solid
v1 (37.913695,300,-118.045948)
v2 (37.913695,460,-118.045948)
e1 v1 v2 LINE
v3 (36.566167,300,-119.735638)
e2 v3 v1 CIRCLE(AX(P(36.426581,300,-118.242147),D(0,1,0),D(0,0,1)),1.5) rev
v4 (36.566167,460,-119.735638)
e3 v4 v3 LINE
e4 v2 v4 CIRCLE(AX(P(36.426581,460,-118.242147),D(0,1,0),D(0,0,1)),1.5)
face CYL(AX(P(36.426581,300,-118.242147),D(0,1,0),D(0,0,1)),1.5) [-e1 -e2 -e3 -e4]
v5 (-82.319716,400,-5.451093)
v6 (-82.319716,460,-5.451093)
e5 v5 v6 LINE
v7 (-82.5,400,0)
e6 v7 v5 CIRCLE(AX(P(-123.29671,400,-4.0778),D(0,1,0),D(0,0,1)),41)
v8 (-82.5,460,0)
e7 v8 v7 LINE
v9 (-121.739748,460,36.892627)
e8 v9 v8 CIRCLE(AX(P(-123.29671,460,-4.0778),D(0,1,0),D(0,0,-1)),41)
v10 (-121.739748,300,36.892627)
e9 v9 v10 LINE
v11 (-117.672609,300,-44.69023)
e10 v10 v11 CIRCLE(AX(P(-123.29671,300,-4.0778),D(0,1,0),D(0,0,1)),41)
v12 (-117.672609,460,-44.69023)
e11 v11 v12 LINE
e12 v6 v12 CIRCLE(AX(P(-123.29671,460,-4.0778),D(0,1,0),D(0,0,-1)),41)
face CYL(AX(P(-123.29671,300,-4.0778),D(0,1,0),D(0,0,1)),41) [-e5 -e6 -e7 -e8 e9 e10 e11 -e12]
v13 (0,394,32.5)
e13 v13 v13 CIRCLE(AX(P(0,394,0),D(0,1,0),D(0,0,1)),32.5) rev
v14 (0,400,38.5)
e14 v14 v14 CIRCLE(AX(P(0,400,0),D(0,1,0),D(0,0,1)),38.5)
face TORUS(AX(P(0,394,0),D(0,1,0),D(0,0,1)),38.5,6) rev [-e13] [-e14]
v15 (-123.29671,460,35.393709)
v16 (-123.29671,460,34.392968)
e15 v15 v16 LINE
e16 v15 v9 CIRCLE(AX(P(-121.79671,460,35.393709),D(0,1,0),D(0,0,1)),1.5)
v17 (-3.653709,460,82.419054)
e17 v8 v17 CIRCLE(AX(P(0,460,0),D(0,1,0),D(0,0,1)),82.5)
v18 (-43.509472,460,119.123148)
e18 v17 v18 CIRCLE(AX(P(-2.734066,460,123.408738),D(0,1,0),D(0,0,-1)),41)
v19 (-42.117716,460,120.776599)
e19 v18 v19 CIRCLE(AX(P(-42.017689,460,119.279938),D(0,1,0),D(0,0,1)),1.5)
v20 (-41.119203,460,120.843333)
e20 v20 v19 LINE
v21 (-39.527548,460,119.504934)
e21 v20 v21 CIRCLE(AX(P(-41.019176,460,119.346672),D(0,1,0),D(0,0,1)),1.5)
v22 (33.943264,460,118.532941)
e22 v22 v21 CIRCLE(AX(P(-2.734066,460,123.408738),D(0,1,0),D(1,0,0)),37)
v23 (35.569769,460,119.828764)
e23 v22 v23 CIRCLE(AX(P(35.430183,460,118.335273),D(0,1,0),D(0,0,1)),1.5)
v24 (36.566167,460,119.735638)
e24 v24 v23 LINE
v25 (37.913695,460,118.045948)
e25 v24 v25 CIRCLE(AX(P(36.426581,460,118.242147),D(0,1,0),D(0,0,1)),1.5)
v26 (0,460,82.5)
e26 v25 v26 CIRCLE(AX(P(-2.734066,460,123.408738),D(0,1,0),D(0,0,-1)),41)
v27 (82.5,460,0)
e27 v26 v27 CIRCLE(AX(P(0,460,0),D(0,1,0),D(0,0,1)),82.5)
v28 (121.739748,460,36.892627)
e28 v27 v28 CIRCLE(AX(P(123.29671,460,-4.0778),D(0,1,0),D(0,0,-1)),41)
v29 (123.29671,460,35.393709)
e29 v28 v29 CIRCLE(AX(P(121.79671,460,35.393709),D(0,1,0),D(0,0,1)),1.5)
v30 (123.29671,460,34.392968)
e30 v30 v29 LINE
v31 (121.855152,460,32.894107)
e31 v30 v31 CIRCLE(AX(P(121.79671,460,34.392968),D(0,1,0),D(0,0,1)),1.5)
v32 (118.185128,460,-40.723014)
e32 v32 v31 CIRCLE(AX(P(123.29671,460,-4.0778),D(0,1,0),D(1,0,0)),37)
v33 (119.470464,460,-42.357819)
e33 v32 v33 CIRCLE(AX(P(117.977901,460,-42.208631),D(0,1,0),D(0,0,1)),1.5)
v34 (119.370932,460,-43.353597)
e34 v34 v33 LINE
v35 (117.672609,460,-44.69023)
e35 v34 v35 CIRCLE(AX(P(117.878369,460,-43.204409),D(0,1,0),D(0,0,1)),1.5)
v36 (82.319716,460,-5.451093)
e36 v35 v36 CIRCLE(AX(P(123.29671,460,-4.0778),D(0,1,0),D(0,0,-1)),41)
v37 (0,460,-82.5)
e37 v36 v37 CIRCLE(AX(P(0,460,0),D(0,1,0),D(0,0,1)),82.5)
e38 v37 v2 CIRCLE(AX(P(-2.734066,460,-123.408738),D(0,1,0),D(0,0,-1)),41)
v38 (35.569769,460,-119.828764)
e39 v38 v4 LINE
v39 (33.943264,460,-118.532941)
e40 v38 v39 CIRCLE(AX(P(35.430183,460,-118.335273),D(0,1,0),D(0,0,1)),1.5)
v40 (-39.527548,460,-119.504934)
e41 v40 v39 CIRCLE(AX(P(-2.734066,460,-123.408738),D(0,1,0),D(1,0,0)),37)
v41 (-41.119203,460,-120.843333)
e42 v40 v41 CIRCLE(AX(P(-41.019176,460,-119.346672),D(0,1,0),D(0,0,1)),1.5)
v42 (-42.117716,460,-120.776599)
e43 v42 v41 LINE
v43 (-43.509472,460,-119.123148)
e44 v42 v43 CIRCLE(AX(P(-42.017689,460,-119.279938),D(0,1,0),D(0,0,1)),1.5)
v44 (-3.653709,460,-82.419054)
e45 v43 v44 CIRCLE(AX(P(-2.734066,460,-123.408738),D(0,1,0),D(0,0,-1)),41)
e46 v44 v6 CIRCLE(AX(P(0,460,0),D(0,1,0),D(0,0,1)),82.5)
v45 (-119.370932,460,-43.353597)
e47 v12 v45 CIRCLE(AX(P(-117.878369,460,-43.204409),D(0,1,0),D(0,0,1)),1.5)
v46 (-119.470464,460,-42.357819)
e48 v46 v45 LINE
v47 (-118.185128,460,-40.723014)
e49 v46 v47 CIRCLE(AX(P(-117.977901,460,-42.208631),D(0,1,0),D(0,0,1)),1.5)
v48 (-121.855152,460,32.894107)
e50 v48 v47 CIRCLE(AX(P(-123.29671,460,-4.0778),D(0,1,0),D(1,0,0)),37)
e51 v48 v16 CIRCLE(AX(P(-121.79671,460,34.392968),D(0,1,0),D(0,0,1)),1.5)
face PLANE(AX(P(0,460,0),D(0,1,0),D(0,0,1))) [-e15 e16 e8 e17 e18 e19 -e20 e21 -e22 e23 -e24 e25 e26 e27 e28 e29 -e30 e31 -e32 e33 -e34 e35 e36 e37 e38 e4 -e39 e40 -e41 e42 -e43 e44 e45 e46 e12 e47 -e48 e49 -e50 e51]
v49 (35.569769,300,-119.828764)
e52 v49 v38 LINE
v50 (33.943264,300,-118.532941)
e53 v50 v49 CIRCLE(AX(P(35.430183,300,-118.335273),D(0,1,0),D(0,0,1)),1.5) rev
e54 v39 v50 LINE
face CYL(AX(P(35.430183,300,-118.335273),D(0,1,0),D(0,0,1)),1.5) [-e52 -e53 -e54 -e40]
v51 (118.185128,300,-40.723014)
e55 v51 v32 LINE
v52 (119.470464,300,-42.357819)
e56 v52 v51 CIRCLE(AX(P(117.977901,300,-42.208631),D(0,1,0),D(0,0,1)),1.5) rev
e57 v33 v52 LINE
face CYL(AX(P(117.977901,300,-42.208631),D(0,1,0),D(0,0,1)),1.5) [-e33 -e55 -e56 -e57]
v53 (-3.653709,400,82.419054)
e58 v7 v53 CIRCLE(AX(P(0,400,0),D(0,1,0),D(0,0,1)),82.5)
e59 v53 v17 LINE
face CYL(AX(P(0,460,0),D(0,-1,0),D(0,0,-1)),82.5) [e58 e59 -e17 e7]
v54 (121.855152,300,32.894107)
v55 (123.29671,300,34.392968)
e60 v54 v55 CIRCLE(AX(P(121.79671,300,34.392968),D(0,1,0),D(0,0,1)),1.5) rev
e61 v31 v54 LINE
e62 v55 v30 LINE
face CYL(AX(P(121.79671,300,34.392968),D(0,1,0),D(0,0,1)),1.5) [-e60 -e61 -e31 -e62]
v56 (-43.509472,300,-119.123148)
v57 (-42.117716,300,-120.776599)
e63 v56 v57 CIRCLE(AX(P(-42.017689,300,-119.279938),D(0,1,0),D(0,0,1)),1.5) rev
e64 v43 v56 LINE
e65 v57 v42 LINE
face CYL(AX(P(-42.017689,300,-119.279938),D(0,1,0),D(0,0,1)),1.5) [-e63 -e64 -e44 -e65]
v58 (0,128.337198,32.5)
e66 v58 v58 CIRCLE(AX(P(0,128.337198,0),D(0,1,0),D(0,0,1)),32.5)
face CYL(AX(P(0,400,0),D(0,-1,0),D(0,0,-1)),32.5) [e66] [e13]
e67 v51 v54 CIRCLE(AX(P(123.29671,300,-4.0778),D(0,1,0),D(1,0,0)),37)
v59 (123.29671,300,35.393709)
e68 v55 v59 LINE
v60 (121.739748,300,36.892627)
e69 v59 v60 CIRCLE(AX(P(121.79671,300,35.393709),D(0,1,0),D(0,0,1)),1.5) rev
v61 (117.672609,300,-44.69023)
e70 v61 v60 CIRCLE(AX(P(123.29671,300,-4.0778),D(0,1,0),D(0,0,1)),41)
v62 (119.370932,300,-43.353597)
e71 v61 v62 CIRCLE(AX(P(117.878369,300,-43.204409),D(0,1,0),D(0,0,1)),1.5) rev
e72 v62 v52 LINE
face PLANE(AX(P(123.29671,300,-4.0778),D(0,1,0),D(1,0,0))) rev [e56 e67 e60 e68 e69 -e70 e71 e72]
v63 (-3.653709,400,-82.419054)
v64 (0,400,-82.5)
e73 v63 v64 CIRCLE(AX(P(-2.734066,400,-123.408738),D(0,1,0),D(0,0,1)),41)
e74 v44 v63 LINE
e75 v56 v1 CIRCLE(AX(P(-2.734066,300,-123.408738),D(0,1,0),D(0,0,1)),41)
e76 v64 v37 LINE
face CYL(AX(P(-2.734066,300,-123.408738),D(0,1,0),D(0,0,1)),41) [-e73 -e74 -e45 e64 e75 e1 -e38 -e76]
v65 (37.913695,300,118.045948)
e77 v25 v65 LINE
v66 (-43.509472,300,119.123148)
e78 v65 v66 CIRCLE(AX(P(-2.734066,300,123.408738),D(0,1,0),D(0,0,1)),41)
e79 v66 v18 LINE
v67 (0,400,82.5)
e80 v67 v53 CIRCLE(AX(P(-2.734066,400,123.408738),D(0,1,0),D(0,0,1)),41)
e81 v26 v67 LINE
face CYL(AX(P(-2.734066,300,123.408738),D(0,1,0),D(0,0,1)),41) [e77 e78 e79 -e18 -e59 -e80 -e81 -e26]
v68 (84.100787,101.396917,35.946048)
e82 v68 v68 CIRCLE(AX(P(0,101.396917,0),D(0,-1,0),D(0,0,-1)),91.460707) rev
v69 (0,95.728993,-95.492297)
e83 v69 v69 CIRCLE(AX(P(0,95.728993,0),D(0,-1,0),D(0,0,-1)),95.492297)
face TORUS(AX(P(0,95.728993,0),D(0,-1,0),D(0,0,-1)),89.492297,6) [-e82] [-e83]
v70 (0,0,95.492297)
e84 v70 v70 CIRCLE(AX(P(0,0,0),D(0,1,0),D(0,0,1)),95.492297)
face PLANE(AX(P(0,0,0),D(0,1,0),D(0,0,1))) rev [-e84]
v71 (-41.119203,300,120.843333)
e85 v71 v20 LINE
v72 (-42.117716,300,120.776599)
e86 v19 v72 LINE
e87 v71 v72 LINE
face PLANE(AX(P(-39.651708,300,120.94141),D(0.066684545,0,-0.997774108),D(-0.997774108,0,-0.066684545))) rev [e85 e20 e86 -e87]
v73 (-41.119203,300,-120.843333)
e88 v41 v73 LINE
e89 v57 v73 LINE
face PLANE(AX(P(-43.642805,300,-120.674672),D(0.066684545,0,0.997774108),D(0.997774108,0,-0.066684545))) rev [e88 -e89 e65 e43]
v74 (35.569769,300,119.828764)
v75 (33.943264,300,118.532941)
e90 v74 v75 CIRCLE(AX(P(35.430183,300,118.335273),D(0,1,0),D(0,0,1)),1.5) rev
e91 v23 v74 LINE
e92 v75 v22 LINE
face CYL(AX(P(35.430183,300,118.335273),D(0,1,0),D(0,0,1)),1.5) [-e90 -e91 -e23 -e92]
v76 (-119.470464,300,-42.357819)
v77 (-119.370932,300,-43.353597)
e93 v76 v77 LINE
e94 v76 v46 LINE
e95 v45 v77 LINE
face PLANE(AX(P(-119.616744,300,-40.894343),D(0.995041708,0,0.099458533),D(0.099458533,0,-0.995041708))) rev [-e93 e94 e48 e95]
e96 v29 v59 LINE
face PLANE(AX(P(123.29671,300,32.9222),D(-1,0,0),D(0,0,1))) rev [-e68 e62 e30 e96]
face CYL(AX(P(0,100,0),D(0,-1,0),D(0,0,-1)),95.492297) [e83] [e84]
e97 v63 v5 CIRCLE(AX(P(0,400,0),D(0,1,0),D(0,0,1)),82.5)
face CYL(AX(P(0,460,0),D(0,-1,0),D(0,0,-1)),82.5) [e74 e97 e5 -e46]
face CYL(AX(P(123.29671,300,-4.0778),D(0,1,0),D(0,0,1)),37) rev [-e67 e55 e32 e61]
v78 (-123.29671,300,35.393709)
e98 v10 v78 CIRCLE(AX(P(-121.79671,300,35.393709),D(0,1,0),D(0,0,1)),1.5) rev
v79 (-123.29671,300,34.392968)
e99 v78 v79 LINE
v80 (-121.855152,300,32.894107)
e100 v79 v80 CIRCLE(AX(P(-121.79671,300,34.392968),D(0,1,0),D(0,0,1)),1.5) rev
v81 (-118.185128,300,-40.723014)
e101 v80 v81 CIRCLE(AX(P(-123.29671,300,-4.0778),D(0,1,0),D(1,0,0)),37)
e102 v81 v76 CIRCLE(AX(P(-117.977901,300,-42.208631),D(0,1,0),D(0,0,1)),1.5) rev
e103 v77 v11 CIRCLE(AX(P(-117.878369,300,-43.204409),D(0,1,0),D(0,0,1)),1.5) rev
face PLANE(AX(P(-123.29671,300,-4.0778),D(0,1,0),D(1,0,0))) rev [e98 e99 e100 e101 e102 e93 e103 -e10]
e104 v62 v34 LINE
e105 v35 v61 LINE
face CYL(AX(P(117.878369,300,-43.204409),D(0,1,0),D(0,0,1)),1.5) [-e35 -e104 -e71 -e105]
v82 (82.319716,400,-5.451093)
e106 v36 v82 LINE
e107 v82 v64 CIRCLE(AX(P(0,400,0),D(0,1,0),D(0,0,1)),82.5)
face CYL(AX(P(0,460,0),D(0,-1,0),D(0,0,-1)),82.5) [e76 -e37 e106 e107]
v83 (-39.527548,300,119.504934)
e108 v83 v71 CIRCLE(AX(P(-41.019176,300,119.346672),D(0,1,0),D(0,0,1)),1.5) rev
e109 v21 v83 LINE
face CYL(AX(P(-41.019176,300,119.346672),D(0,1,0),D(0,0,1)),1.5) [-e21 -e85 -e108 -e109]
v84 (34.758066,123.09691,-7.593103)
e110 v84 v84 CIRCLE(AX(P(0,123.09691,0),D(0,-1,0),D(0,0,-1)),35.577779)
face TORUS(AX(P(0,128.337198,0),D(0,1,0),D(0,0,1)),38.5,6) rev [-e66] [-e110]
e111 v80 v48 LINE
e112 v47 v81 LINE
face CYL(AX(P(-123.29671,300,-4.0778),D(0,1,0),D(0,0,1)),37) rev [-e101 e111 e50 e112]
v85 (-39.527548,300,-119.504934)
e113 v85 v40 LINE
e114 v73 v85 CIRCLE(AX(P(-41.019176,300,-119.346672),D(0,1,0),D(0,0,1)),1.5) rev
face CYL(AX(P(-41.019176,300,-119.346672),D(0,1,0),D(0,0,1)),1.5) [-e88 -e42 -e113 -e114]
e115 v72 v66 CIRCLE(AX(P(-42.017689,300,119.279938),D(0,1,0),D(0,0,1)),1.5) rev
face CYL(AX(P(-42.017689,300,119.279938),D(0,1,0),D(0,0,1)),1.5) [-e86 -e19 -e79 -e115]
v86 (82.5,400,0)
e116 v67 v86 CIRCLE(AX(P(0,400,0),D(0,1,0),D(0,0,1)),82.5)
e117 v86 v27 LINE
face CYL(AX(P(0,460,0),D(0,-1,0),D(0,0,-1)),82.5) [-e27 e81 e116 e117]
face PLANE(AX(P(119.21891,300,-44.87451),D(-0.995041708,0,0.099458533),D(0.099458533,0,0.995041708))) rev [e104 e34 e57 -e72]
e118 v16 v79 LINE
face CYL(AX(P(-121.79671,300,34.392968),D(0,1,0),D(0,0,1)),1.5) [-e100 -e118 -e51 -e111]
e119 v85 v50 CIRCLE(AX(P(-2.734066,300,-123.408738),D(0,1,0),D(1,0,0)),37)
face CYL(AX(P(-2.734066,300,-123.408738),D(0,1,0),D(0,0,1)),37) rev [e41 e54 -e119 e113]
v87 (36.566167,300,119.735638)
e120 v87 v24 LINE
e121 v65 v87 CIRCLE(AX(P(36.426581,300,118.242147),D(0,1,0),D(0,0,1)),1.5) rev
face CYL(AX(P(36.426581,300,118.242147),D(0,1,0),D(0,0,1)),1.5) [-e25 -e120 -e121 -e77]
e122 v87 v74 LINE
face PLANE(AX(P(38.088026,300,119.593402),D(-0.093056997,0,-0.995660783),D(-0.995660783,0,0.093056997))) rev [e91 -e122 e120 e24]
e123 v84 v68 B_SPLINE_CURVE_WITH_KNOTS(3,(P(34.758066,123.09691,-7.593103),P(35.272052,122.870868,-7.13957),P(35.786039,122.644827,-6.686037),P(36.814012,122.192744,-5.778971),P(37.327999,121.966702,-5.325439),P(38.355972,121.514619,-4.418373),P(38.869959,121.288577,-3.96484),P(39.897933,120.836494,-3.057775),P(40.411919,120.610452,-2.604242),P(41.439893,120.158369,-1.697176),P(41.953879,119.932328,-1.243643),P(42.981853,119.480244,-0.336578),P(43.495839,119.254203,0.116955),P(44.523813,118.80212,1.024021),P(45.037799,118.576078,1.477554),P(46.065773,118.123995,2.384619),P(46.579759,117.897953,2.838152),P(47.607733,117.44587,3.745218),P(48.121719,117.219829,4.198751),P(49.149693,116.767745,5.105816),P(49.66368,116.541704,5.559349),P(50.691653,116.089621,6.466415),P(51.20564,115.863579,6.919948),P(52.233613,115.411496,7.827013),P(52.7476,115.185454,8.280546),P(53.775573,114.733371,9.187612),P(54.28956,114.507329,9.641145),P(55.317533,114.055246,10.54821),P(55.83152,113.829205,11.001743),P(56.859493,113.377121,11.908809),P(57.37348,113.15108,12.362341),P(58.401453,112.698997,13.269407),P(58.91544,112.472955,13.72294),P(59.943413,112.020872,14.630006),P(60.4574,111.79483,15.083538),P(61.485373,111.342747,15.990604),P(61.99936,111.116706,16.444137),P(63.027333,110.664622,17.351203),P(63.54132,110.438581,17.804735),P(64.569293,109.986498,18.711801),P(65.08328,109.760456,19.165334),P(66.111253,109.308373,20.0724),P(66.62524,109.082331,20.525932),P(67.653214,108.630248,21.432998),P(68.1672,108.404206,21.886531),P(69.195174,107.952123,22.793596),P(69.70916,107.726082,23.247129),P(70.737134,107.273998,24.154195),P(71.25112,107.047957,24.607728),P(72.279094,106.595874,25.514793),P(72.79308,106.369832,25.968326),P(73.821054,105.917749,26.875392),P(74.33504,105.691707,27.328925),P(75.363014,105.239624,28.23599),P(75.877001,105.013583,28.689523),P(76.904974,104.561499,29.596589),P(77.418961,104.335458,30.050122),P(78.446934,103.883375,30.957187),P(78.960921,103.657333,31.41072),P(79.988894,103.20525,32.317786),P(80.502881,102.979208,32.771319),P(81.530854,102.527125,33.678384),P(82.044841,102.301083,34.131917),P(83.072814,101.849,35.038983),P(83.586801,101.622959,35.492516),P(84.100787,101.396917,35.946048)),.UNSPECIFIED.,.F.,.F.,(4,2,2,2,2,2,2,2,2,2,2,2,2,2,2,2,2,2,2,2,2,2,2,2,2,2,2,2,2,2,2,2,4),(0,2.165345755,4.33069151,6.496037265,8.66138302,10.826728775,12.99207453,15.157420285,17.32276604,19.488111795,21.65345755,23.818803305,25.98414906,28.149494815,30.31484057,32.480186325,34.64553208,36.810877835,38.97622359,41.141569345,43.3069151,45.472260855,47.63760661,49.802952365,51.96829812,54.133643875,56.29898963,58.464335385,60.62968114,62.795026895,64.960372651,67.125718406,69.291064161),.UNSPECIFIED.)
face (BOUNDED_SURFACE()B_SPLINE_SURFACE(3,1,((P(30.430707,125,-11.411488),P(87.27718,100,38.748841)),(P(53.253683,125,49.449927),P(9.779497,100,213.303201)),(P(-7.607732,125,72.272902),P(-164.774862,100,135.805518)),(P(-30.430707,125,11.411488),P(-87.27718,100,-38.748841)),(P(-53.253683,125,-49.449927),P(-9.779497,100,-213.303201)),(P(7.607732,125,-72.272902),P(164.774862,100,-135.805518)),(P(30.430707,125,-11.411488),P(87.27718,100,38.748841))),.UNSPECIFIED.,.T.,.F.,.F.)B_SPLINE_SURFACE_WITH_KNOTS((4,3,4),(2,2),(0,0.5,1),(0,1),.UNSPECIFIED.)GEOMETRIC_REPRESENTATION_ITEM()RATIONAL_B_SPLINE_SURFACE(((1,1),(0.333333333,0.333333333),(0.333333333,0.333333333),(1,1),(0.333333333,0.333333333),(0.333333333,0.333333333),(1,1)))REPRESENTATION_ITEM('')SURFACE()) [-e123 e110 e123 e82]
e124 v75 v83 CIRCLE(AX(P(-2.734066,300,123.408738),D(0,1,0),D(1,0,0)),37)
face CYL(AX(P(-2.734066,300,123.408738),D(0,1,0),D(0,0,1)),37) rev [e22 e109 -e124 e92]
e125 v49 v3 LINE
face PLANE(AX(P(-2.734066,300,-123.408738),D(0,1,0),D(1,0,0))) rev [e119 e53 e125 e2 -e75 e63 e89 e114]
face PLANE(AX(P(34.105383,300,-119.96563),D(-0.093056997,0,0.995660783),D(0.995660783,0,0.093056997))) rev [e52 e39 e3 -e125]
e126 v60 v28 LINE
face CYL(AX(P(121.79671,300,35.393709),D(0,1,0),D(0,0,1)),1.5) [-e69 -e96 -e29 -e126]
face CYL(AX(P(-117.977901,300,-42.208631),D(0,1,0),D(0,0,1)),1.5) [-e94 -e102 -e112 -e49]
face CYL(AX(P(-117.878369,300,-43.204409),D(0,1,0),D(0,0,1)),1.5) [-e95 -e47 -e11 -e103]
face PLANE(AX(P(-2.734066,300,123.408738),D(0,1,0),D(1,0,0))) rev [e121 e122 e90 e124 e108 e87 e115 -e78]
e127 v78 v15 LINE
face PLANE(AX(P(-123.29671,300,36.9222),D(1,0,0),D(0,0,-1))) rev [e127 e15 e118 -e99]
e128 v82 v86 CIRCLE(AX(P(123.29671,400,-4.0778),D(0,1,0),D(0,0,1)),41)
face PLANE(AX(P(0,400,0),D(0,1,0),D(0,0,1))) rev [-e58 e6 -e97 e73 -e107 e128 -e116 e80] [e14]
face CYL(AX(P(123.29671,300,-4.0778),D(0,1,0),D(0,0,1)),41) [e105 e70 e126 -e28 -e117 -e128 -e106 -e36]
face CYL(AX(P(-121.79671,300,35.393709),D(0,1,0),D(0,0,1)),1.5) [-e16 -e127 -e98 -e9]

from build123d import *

# Parameters (mm, degrees)
SKETCH1_R           = 95.492297116
BOSS_EXTRUDE1_DEPTH = 100
SKETCH3_3_R         = 32.5
TUBE_DEPTH          = 275
SKETCH5_R           = 82.5
TOP_HUB_DEPTH       = 60
BLADES_DEPTH        = 160
FILLET3_R           = 1.5
FILLET5_R           = 6
FILLET6_R           = 6


with BuildPart() as part:
    # Sketch1 → Boss-Extrude1 (new body)
    with BuildSketch(Plane(origin=(0, 0, 0), x_dir=(1, 0, 0), z_dir=(0, 1, 0))):
        with Locations(Location((0, 0, 0), (0, 0, 270))):
            Circle(SKETCH1_R)
    extrude(amount=BOSS_EXTRUDE1_DEPTH)

    # Loft2: read off the stored shape, not the designer's step
    # Loft2: loft between two sections, ruled curve by curve
    loft2_from = [
        Edge.make_bspline([(30.430707277, 125, -11.411487835), (53.253682947, 125, 49.44992672), (-7.607731608, 125, 72.272902389), (-30.430707277, 125, 11.411487835), (-53.253682947, 125, -49.44992672), (7.607731608, 125, -72.272902389), (30.430707277, 125, -11.411487835)], [0, 0, 0, 0, 0.5, 0.5, 0.5, 1, 1, 1, 1], 3, [1, 0.333333333, 0.333333333, 1, 0.333333333, 0.333333333, 1]),
    ]
    loft2_to = [
        Edge.make_bspline([(87.277179809, 100, 38.748841183), (9.779497444, 100, 213.303200802), (-164.774862175, 100, 135.805518436), (-87.277179809, 100, -38.748841183), (-9.779497444, 100, -213.303200802), (164.774862175, 100, -135.805518436), (87.277179809, 100, 38.748841183)], [0, 0, 0, 0, 0.5, 0.5, 0.5, 1, 1, 1, 1], 3, [1, 0.333333333, 0.333333333, 1, 0.333333333, 0.333333333, 1]),
    ]
    loft2 = Solid(Shell([*[Face.make_surface_from_curves(loft2_from[k], loft2_to[k]) for k in range(1)], Face(Wire(loft2_from)), Face(Wire(loft2_to))]))
    add(loft2)

    # Sketch3<3> → tube (add)
    with BuildSketch(Plane(origin=(0, 125, 0), x_dir=(1, 0, 0), z_dir=(0, 1, 0))):
        with Locations(Location((0, 0, 0), (0, 0, 20.556))):
            Circle(SKETCH3_3_R)
    extrude(amount=TUBE_DEPTH)

    # Sketch5 → top_hub (add)
    with BuildSketch(Plane(origin=(0, 400, 0), x_dir=(1, 0, 0), z_dir=(0, 1, 0))):
        with Locations(Location((0, 0, 0), (0, 0, 270))):
            Circle(SKETCH5_R)
    extrude(amount=TOP_HUB_DEPTH)

    # Sketch8 → Blades (add)
    with BuildSketch(Plane(origin=(0, 460, 0), x_dir=(1, 0, 0), z_dir=(0, 1, 0))):
        with BuildLine():
            ThreePointArc((123.296710019, -36.922200146), (95.784801634, -26.321129354), (82.5, 0))
            ThreePointArc((82.5, 0), (91.565639785, 30.041990229), (119.218910164, 44.874509873))
            Line((119.218910164, 44.874509873), (119.616744296, 40.894343042))
            ThreePointArc((119.616744296, 40.894343042), (94.661353954, 27.508898485), (86.480166831, 0.397834132))
            ThreePointArc((86.480166831, 0.397834132), (98.468890257, -23.355380163), (123.296710019, -32.922200146))
            Line((123.296710019, -32.922200146), (123.296710019, -36.922200146))
        make_face()
        with BuildLine():
            ThreePointArc((-119.218910164, 44.874509873), (-91.565639785, 30.041990229), (-82.5, 0))
            ThreePointArc((-82.5, 0), (-95.784801634, -26.321129354), (-123.296710019, -36.922200146))
            Line((-123.296710019, -36.922200146), (-123.296710019, -32.922200146))
            ThreePointArc((-123.296710019, -32.922200146), (-98.468890257, -23.355380163), (-86.480166831, 0.397834132))
            ThreePointArc((-86.480166831, 0.397834132), (-94.661353954, 27.508898485), (-119.616744296, 40.894343042))
            Line((-119.616744296, 40.894343042), (-119.218910164, 44.874509873))
        make_face()
        with BuildLine():
            ThreePointArc((38.088025782, 119.593401567), (25.871262622, 94.036384856), (0, 82.5))
            ThreePointArc((0, 82.5), (-29.727635854, 92.548615238), (-43.642804778, 120.674672115))
            Line((-43.642804778, 120.674672115), (-39.651708344, 120.941410294))
            ThreePointArc((-39.651708344, 120.941410294), (-27.094116876, 95.559358966), (-0.266738179, 86.491096434))
            ThreePointArc((-0.266738179, 86.491096434), (23.080498822, 96.901980328), (34.105382649, 119.965629555))
            Line((34.105382649, 119.965629555), (38.088025782, 119.593401567))
        make_face()
        with BuildLine():
            ThreePointArc((-43.642804778, -120.674672115), (-29.727635854, -92.548615238), (0, -82.5))
            ThreePointArc((0, -82.5), (25.871262622, -94.036384856), (38.088025782, -119.593401567))
            Line((38.088025782, -119.593401567), (34.105382649, -119.965629555))
            ThreePointArc((34.105382649, -119.965629555), (23.080498822, -96.901980328), (-0.266738179, -86.491096434))
            ThreePointArc((-0.266738179, -86.491096434), (-27.094116876, -95.559358966), (-39.651708344, -120.941410294))
            Line((-39.651708344, -120.941410294), (-43.642804778, -120.674672115))
        make_face()
    extrude(amount=-BLADES_DEPTH)

    # Fillet3
    fillet3_edges = [part.edges().sort_by_distance(p)[0] for p in [
        (123.296710019, 380, 36.922200146),
        (119.218910164, 380, -44.874509873),
        (119.616744296, 380, -40.894343042),
        (123.296710019, 380, 32.922200146),
        (-119.218910164, 380, -44.874509873),
        (-123.296710019, 380, 36.922200146),
        (-123.296710019, 380, 32.922200146),
        (-119.616744296, 380, -40.894343042),
        (38.088025782, 380, -119.593401567),
        (-43.642804778, 380, -120.674672115),
        (-39.651708344, 380, -120.941410294),
        (34.105382649, 380, -119.965629555),
        (-43.642804778, 380, 120.674672115),
        (38.088025782, 380, 119.593401567),
        (34.105382649, 380, 119.965629555),
        (-39.651708344, 380, 120.941410294),
    ]]
    fillet(fillet3_edges, radius=FILLET3_R)

    # Fillet5
    fillet5_edges = [part.edges().sort_by_distance(p)[0] for p in [
        (52.050758656, 100, 80.059336319),
        (-30.430707277, 125, 11.411487835),
    ]]
    fillet(fillet5_edges, radius=FILLET5_R)

    # Fillet6
    fillet6_edges = [part.edges().sort_by_distance(p)[0] for p in [
        (-30.430707277, 400, 11.411487835),
    ]]
    fillet(fillet6_edges, radius=FILLET6_R)


solid = part.part
